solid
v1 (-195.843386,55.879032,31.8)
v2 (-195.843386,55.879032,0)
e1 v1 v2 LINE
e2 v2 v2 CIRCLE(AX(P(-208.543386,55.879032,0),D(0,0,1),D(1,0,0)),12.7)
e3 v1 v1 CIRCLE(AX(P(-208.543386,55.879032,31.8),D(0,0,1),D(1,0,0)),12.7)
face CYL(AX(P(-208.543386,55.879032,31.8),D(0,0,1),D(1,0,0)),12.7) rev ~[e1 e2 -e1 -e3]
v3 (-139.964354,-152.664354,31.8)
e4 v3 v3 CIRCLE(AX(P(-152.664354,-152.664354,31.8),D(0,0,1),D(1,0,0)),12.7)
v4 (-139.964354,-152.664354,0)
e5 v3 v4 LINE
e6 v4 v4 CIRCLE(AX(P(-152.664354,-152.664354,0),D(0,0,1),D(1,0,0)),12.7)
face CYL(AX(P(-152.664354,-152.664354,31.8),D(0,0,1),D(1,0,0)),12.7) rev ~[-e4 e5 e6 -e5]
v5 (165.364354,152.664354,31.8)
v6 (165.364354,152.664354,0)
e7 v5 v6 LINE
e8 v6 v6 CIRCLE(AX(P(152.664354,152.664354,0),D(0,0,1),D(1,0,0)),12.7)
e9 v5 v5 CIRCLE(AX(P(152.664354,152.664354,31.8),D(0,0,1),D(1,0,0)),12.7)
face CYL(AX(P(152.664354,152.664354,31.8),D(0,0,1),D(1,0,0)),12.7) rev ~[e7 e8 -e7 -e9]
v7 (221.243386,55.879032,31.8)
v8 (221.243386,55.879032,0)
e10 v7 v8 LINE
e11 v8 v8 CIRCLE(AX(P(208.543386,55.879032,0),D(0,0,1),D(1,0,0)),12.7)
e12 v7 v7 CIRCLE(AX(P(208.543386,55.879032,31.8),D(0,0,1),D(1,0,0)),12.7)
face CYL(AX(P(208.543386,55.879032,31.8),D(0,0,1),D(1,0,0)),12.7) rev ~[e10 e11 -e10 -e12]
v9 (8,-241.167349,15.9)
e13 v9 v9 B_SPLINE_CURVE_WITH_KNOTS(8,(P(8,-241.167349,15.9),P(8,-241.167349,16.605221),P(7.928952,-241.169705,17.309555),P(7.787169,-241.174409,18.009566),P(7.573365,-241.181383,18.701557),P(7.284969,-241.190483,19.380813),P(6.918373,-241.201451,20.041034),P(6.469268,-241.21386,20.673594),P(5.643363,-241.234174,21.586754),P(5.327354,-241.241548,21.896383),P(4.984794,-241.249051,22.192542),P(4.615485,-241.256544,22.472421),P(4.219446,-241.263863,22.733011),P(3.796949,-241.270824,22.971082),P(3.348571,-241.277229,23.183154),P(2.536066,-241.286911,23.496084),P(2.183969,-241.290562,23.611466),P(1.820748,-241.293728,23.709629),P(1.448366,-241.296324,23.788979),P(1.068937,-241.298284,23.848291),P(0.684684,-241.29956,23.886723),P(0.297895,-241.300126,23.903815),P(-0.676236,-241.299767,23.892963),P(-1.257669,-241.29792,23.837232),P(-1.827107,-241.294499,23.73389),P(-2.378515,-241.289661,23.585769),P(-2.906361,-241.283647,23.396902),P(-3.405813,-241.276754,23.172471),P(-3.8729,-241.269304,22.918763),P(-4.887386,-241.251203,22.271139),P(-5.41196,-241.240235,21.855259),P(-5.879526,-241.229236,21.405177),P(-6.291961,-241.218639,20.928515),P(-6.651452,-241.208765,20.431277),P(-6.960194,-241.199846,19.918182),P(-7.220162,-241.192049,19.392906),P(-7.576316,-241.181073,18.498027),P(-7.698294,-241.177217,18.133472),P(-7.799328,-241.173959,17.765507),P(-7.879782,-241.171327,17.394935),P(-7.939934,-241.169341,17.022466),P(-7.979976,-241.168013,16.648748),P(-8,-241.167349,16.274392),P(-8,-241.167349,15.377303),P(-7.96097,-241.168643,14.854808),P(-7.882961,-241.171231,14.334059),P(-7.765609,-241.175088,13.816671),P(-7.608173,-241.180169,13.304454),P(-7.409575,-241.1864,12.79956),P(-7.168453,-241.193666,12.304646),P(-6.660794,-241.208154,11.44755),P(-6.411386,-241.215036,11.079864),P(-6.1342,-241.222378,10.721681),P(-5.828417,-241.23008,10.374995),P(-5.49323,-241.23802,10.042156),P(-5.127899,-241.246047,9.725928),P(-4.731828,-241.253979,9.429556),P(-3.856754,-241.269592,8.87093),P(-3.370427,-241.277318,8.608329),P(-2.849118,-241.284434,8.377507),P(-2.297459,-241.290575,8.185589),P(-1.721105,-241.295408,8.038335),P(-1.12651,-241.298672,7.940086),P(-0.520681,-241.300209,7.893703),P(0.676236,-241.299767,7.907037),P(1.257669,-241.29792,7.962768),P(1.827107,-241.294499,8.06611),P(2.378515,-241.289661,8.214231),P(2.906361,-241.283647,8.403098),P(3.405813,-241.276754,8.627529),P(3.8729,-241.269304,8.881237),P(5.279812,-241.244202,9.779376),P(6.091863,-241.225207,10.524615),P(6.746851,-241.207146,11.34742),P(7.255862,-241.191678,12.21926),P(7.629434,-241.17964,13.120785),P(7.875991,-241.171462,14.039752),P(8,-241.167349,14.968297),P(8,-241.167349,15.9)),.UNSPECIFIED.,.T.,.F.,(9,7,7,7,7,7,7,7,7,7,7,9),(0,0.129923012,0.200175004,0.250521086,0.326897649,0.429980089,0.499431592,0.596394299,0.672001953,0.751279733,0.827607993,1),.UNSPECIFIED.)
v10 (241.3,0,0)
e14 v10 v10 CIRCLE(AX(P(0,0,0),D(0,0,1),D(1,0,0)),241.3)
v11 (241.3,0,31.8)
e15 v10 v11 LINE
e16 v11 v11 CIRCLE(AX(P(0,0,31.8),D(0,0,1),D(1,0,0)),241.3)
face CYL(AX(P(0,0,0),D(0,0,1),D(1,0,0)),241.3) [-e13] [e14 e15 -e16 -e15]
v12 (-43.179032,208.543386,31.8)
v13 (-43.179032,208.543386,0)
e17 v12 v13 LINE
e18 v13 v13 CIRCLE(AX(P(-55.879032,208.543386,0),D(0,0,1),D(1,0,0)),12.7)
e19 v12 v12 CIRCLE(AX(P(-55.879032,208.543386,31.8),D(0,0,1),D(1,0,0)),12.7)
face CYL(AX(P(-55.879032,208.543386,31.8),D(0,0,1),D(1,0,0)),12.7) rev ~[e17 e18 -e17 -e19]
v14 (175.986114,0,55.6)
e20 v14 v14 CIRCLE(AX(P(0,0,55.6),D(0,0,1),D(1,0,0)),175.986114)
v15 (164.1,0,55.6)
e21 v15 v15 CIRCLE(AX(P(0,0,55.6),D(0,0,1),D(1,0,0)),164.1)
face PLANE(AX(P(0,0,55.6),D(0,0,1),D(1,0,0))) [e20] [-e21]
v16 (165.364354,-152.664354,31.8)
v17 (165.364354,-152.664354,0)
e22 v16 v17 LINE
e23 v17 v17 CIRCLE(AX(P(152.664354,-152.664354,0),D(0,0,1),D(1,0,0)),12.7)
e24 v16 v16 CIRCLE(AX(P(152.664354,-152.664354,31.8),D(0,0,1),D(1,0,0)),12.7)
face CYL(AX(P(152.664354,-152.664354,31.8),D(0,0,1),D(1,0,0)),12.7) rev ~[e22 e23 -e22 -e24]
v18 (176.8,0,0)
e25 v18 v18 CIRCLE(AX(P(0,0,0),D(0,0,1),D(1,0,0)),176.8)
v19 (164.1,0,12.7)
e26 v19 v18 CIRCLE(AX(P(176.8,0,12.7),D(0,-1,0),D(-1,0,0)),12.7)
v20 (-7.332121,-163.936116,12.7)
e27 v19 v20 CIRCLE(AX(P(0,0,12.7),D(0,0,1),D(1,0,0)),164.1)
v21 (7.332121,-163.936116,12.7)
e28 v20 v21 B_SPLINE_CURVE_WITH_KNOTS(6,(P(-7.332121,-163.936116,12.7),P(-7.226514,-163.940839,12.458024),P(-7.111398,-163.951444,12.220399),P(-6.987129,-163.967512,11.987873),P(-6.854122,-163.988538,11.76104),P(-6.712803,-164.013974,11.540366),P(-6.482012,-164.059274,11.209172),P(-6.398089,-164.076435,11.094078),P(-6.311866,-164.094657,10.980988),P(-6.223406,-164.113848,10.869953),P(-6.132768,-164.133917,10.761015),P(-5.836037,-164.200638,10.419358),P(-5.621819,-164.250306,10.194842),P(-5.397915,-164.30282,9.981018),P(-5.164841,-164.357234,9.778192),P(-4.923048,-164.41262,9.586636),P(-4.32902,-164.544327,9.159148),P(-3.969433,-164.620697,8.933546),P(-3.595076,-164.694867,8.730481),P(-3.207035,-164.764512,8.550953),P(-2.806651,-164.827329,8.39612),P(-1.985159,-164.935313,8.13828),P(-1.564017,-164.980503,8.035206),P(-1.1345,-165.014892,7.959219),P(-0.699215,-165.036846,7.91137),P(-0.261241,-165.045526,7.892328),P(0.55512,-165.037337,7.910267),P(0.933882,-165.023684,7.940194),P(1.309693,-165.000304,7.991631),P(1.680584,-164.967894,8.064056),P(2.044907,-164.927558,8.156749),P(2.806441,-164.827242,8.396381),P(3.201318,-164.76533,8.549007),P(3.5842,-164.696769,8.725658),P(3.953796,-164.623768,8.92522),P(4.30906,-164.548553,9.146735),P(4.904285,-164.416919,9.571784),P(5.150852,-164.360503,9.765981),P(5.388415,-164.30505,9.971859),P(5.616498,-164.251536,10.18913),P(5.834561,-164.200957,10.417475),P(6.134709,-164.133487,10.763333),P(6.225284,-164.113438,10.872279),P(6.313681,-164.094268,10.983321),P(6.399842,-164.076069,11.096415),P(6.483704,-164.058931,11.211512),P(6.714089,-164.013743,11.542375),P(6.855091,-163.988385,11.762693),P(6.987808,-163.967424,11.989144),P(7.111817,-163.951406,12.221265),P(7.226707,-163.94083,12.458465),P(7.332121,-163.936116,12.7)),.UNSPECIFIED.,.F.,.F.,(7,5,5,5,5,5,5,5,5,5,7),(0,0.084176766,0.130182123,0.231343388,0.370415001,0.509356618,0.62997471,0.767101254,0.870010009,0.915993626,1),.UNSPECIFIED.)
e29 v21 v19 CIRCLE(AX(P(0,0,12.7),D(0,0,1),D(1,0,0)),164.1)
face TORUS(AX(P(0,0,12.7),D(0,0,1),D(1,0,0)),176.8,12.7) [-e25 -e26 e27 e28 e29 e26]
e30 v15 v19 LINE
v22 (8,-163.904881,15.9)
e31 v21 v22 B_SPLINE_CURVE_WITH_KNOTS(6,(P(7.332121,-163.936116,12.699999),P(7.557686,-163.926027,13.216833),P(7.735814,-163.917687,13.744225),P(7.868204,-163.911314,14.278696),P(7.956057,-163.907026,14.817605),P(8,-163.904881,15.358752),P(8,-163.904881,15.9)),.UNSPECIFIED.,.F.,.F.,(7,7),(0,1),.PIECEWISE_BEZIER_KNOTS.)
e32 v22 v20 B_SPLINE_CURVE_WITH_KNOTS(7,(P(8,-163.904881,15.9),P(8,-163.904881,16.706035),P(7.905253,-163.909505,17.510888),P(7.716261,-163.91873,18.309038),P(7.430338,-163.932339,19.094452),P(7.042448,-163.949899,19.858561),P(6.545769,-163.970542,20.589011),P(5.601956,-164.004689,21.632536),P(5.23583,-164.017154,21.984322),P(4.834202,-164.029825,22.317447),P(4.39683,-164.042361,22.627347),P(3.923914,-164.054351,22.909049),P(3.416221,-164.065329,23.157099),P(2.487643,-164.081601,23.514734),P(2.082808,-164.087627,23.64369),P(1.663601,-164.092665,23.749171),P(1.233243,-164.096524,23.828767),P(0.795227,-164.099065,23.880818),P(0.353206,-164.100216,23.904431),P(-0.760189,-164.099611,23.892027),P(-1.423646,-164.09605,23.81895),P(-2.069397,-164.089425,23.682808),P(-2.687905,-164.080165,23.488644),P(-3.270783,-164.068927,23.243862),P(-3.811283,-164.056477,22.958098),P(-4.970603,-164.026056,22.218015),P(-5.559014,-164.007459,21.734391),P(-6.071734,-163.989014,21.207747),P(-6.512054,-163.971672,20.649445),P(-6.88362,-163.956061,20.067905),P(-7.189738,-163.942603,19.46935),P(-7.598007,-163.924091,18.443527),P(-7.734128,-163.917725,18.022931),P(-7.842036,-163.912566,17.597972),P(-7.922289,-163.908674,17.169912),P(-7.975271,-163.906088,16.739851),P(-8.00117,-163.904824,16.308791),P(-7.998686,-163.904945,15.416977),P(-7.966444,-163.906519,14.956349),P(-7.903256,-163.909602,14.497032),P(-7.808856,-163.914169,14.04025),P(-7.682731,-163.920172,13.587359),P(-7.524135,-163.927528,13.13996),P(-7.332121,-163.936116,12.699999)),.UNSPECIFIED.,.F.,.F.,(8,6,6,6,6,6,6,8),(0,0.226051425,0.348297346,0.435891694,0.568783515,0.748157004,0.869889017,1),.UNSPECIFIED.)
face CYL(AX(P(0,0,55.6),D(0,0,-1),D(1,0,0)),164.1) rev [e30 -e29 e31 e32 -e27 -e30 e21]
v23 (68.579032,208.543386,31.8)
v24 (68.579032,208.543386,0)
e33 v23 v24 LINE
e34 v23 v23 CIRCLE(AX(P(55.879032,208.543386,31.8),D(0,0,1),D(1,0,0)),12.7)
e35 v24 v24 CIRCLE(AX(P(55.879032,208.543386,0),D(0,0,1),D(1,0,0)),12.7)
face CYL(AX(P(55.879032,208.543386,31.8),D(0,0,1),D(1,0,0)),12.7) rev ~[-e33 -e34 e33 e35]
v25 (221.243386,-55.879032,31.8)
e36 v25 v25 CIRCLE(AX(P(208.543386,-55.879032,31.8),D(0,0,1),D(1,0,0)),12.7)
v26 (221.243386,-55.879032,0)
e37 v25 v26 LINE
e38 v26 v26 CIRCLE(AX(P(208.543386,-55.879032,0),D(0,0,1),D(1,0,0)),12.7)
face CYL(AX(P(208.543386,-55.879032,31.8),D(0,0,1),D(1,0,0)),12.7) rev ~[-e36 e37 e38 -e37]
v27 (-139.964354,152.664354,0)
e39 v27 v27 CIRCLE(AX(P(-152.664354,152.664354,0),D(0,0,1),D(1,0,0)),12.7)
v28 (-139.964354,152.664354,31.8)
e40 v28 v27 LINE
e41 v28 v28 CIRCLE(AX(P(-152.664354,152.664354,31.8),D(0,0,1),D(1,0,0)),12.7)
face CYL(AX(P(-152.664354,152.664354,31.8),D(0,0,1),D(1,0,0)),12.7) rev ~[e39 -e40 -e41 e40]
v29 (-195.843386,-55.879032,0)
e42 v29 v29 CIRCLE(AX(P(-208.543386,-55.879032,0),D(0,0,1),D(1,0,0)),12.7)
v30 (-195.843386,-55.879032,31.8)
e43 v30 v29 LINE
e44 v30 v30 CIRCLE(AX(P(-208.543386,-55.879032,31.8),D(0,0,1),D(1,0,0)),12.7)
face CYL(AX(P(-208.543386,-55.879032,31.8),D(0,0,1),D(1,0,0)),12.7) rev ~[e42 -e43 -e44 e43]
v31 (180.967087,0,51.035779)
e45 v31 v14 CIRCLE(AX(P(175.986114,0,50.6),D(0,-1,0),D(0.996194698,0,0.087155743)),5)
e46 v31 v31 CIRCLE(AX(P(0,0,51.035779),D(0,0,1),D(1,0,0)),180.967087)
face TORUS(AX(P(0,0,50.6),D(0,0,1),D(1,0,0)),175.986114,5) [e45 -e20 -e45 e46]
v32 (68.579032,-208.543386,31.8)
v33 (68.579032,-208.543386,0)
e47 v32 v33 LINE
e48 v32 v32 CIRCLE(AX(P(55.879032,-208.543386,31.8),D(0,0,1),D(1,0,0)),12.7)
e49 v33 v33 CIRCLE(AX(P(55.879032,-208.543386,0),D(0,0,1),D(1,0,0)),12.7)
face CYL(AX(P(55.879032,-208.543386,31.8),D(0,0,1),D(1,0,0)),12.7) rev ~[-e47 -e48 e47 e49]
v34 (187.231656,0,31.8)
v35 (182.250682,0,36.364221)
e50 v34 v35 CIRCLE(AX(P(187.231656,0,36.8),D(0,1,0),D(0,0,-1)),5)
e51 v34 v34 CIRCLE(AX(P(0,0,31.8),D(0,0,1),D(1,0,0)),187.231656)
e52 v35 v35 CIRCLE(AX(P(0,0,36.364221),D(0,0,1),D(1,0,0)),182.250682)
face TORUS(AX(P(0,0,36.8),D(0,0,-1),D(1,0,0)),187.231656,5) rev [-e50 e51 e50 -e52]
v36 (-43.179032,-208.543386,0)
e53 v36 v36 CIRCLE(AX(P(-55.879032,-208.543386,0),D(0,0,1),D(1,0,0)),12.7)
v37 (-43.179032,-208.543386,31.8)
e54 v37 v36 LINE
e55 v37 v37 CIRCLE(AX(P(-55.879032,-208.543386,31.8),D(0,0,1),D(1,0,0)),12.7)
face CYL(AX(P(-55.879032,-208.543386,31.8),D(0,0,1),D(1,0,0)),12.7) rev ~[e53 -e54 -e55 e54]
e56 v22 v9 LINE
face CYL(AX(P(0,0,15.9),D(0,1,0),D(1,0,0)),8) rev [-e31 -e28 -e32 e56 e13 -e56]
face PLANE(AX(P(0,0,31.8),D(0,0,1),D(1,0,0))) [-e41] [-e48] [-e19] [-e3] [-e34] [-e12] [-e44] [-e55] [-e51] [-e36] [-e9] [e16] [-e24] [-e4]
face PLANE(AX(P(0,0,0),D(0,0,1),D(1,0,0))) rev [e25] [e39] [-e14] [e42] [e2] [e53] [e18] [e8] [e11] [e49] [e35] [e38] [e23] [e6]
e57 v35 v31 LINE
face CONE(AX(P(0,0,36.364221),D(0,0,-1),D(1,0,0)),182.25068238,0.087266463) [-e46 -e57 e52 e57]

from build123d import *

# Parameters (mm, degrees)
F2_R     = 12.7
F3_DEPTH = 31.801
F4_R     = 8
F5_DEPTH = 241.301


# Not quite as in the source:
# - a feature names something its author has since deleted; it is built from what else it names


with BuildPart() as f1:
    # F0 (on Front) → F1 (revolve)
    with BuildSketch(Plane.XZ):
        with BuildLine():
            ThreePointArc((164.1, 12.7), (167.8197438789, 3.7197438789), (176.8, 0))
            Line((176.8, 0), (241.3, 0))
            Line((241.3, 0), (241.3, 31.8))
            Line((241.3, 31.8), (187.2316558701, 31.8))
            ThreePointArc((187.2316558701, 31.8), (183.853704832, 33.1136133159), (182.2506823796, 36.3642212863))
            Line((182.2506823796, 36.3642212863), (180.9670874285, 51.0357787137))
            ThreePointArc((180.9670874285, 51.0357787137), (179.3640649761, 54.2863866841), (175.986113938, 55.6))
            Line((175.986113938, 55.6), (164.1, 55.6))
            Line((164.1, 55.6), (164.1, 12.7))
        make_face()
    revolve(axis=Axis((0, 0, 27.8), (0, 0, 1)))

    # F2 (on face) → F3 (cut, through all)
    with BuildSketch(Plane.XY.offset(31.8)):
        with Locations((-55.8790318376, 208.5433858958)):
            Circle(F2_R)
        with Locations((-152.6643540582, 152.6643540582)):
            Circle(F2_R)
        with Locations((-208.5433858958, 55.8790318376)):
            Circle(F2_R)
        with Locations((-208.5433858958, -55.8790318376)):
            Circle(F2_R)
        with Locations((-152.6643540582, -152.6643540582)):
            Circle(F2_R)
        with Locations((-55.8790318376, -208.5433858958)):
            Circle(F2_R)
        with Locations((55.8790318376, -208.5433858958)):
            Circle(F2_R)
        with Locations((152.6643540582, -152.6643540582)):
            Circle(F2_R)
        with Locations((208.5433858958, -55.8790318376)):
            Circle(F2_R)
        with Locations((208.5433858958, 55.8790318376)):
            Circle(F2_R)
        with Locations((152.6643540582, 152.6643540582)):
            Circle(F2_R)
        with Locations((55.8790318376, 208.5433858958)):
            Circle(F2_R)
    extrude(amount=-F3_DEPTH, mode=Mode.SUBTRACT)

    # F4 (on Front) → F5 (cut, through all)
    with BuildSketch(Plane.XZ):
        with Locations((0, 15.9)):
            Circle(F4_R)
    extrude(amount=F5_DEPTH, mode=Mode.SUBTRACT)


solid = f1.part
